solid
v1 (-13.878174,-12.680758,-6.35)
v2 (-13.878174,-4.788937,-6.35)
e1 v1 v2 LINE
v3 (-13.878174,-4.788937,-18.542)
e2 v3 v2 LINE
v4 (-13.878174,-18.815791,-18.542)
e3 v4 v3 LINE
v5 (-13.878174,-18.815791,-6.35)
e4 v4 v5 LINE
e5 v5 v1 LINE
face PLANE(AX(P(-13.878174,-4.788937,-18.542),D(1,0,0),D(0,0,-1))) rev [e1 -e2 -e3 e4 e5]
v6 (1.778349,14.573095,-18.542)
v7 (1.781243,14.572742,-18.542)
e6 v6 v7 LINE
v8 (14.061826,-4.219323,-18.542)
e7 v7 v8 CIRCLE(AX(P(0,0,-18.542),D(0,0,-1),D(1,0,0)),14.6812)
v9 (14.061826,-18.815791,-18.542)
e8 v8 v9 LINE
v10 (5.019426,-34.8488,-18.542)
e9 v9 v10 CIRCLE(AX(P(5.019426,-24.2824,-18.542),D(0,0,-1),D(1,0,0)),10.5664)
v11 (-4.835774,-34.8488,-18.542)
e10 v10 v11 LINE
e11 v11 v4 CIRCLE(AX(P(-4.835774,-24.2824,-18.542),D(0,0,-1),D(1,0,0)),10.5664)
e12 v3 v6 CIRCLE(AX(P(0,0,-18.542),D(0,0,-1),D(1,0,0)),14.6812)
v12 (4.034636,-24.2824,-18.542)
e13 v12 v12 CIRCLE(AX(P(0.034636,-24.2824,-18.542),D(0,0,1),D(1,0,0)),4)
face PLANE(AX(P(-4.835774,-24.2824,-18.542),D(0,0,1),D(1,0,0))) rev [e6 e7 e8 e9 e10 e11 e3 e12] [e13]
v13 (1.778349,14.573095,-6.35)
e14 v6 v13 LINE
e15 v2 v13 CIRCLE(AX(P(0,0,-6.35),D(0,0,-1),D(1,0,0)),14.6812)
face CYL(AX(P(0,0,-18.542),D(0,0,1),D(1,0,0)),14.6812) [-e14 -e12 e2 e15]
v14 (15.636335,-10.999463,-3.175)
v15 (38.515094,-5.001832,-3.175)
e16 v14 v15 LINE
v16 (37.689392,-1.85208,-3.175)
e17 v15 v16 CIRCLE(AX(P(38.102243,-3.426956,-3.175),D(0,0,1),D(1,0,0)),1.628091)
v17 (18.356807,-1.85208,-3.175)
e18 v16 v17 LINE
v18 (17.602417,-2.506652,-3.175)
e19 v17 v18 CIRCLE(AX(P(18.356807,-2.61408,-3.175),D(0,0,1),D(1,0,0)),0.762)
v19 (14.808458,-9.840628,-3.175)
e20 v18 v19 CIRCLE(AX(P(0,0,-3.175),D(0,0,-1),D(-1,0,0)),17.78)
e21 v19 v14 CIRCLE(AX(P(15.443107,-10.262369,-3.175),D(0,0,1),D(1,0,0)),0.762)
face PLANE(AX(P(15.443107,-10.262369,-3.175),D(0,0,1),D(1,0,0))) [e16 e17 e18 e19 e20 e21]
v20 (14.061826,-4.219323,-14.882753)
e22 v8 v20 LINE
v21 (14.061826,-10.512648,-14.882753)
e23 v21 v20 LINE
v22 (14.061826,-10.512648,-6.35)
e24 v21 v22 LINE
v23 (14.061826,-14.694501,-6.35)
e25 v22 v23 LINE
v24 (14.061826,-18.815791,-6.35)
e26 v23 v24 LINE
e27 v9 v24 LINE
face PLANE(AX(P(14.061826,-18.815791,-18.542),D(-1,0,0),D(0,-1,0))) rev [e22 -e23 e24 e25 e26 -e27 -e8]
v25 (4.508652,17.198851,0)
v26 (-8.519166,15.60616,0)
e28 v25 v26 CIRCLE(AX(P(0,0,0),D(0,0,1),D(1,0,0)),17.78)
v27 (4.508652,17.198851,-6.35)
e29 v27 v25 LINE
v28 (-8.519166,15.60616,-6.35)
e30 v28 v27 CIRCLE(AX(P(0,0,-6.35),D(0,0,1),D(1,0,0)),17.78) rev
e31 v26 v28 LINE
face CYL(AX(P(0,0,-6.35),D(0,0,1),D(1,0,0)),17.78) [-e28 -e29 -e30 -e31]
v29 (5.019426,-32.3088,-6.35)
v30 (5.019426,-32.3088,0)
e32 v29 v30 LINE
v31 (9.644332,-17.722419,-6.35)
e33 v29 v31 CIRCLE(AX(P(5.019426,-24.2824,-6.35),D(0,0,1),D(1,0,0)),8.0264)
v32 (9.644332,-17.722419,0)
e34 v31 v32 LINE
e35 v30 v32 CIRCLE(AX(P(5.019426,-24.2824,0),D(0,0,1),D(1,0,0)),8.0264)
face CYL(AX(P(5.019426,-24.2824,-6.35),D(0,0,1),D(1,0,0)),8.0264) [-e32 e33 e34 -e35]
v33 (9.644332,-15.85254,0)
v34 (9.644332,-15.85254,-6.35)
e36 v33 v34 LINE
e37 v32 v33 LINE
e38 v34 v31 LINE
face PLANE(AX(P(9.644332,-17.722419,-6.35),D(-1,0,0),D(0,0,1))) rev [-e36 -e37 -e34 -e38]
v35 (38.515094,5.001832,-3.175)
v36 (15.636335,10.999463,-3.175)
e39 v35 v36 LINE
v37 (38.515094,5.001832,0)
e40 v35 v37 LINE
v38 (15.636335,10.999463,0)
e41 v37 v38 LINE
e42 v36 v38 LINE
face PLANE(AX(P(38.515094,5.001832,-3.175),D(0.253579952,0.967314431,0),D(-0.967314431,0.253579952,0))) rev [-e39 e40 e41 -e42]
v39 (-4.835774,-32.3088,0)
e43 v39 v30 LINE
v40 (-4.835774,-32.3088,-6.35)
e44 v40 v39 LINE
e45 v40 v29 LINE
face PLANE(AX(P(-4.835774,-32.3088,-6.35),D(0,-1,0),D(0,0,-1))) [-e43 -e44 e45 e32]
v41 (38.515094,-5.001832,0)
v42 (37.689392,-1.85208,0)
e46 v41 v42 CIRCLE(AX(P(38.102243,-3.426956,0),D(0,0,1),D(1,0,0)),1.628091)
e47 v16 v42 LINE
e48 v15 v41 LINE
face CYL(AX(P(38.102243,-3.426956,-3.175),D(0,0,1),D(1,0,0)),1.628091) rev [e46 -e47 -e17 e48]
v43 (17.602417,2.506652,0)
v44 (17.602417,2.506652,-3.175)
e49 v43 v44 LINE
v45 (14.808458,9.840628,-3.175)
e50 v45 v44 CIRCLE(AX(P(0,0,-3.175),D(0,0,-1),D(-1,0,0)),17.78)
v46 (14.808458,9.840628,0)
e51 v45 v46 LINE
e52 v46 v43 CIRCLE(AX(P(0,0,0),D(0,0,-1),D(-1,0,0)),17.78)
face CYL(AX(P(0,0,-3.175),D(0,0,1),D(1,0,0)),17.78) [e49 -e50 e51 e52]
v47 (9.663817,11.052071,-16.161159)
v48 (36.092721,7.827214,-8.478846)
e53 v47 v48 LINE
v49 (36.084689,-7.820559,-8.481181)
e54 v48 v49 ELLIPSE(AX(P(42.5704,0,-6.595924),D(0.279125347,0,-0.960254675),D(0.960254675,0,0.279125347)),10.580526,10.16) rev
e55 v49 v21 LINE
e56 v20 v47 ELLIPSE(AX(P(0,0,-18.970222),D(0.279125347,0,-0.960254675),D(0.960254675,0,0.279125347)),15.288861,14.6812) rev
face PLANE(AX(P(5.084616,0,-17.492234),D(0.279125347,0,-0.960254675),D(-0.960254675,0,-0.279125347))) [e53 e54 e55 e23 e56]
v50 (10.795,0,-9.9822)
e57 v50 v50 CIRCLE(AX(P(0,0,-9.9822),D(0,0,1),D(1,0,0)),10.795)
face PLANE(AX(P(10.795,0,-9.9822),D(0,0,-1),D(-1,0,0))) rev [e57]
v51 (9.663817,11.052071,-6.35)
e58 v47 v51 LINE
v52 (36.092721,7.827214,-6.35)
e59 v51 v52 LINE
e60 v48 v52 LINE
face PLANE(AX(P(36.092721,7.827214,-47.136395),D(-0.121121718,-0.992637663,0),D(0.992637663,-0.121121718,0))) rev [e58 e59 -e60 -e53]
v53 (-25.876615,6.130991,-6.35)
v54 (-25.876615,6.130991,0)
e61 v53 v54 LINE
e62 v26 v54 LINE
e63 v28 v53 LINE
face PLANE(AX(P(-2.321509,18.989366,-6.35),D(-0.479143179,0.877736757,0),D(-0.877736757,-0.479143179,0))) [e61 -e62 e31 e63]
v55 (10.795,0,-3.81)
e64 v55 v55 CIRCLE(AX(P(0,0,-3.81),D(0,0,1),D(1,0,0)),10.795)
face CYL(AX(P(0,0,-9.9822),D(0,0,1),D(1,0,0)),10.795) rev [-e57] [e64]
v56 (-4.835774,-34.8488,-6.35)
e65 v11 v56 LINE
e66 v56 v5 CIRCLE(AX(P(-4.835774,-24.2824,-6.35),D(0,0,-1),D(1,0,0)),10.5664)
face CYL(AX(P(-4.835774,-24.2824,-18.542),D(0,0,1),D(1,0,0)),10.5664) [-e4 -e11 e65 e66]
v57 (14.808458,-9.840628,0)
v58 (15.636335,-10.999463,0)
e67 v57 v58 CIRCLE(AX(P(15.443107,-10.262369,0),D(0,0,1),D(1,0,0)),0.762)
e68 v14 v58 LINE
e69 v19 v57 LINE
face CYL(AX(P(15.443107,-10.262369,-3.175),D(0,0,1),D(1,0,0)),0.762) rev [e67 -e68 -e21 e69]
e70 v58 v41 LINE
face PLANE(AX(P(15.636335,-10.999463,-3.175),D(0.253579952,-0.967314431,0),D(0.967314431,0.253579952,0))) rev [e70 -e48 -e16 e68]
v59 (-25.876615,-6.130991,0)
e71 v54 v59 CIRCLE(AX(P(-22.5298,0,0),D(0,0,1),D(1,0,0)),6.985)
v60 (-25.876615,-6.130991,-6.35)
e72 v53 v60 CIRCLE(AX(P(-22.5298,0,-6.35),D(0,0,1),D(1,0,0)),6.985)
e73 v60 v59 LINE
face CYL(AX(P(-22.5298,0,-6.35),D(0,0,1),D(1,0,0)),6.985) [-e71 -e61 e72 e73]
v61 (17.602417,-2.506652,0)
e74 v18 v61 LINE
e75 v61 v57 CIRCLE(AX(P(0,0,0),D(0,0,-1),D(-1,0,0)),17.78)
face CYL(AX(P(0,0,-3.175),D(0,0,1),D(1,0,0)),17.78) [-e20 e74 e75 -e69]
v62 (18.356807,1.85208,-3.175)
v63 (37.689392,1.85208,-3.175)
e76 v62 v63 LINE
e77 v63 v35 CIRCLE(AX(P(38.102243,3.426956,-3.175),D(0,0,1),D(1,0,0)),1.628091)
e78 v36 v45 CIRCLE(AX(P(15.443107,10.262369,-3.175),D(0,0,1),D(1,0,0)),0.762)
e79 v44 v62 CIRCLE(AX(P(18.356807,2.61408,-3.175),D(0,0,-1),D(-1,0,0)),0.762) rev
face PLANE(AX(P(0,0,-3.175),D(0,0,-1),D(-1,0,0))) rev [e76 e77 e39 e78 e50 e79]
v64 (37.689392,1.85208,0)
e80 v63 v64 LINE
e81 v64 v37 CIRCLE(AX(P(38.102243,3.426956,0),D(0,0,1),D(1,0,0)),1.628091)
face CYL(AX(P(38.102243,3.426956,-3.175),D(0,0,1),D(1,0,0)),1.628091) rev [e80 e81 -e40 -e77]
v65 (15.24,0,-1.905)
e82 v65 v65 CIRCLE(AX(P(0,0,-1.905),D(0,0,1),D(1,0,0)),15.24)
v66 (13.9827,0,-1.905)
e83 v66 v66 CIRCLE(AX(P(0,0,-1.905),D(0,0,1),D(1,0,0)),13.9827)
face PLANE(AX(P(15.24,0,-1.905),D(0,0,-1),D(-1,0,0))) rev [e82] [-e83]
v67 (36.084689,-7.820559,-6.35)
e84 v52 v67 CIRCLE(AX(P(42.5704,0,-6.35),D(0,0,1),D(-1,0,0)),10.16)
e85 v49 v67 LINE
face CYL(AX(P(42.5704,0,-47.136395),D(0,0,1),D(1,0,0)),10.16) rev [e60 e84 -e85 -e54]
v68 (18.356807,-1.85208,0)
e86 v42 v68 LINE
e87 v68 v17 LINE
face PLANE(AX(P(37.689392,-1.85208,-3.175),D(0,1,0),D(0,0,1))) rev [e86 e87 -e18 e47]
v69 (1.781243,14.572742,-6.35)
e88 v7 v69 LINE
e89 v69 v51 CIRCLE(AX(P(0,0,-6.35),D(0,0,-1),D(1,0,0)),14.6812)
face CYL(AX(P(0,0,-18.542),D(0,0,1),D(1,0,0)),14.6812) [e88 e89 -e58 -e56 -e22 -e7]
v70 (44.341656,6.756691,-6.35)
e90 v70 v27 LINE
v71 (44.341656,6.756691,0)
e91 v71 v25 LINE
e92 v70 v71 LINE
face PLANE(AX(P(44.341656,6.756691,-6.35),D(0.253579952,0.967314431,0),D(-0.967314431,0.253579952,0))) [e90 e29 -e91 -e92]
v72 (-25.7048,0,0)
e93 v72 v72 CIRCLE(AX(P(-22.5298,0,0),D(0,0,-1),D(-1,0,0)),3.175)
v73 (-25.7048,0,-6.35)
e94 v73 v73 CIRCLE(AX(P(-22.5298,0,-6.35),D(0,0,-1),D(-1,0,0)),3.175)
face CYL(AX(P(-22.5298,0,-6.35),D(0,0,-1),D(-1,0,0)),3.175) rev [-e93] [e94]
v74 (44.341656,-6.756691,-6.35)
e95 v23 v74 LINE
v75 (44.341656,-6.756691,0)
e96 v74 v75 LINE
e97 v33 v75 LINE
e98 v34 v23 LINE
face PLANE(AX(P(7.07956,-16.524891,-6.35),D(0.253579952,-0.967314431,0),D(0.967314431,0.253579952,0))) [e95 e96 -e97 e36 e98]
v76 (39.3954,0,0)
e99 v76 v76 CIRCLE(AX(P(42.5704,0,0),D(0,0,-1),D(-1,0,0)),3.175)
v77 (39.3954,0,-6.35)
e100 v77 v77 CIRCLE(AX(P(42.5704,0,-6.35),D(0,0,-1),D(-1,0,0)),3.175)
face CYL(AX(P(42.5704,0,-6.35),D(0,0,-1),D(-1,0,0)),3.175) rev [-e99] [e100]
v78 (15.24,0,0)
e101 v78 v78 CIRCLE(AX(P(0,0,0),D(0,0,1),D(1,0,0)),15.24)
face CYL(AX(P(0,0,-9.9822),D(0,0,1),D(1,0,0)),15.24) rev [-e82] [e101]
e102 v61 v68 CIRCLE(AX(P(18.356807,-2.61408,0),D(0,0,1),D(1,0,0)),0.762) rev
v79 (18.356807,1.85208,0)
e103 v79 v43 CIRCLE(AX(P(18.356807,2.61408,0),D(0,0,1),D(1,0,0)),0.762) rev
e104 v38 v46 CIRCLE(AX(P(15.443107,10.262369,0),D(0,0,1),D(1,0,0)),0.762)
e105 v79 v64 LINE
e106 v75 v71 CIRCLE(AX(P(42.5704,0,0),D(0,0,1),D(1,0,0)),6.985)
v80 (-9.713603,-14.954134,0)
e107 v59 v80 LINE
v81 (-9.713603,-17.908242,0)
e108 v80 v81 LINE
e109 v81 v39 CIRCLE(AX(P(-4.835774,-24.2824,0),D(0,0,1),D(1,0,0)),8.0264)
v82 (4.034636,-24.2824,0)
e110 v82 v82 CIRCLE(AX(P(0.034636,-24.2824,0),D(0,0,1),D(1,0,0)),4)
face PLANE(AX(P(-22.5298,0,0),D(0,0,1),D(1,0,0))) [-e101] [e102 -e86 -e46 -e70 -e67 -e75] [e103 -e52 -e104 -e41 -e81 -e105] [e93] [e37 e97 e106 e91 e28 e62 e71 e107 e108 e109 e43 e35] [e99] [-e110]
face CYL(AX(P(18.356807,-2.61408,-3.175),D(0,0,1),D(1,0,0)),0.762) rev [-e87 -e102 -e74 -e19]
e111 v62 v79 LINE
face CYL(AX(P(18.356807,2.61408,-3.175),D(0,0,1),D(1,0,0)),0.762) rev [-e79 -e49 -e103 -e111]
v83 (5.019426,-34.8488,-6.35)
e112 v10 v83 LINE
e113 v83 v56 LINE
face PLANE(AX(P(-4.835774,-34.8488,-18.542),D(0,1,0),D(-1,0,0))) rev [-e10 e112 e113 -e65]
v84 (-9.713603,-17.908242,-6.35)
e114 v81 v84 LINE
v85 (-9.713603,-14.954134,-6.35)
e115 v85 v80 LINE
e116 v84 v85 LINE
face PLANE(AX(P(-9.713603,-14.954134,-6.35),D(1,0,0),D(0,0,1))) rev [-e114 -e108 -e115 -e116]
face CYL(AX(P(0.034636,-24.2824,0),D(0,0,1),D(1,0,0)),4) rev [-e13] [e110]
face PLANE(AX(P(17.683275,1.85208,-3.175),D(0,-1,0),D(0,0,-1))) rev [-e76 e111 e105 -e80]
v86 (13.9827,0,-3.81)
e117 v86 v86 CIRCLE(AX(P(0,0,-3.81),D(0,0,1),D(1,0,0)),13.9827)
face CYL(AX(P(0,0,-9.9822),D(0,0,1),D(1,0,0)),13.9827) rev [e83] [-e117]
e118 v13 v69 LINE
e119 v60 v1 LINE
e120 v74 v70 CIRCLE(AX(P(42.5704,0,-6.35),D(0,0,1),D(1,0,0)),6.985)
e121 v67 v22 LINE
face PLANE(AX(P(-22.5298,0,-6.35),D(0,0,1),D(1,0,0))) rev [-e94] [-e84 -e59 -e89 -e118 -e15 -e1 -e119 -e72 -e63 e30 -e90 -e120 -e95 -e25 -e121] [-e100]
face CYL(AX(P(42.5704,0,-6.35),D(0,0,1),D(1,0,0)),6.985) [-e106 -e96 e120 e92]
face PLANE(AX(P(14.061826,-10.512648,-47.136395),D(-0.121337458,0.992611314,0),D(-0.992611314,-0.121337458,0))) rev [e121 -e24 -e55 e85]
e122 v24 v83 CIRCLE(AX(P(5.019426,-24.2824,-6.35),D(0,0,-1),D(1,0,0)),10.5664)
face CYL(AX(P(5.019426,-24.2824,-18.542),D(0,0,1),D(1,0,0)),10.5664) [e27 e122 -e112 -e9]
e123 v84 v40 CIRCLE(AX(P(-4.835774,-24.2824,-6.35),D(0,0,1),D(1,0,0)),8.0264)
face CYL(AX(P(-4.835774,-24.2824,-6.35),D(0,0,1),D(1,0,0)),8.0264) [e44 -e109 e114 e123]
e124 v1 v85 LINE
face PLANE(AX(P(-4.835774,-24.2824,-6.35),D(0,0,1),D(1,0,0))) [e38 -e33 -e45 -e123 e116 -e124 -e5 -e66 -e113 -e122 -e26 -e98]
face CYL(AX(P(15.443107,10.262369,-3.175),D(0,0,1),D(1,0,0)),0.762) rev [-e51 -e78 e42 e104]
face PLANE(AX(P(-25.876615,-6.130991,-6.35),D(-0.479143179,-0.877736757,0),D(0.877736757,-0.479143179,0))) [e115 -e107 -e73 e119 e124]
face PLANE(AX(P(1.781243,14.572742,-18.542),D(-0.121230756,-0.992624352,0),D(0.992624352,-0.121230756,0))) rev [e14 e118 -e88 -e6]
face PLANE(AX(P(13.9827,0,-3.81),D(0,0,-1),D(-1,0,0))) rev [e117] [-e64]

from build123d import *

# Parameters (mm, degrees)
BOSS_EXTRUDE1_DEPTH      = 6.35
BOSS_EXTRUDE2_DEPTH      = 12.192
BOSS_EXTRUDE3_REACH      = 63.797
CUT_EXTRUDE1_DEPTH       = 3.175
CUT_EXTRUDE2_DEPTH       = 3.175
F_8_0_8_DIAMETER_HOLE1_D = 8
HOLE1_D                  = 6.35
CHAMFER1_SIZE            = 3.256138018
CHAMFER2_SIZE            = 2.651435284
FILLET1_R                = 0.762
FILLET2_R                = 17.78


with BuildPart() as part:
    # Sketch1 → Boss-Extrude1 (new body)
    with BuildSketch(Plane.XY):
        with BuildLine():
            Line((-25.876615107, -6.130991244), (-6.855570788, -16.51429077))
            ThreePointArc((-6.855570788, -16.51429077), (-12.797339629, -25.300522195), (-4.835774214, -32.308799856))
            Line((-4.835774214, -32.308799856), (5.019425786, -32.308799856))
            ThreePointArc((5.019425786, -32.308799856), (12.97831912, -25.32120391), (7.079560008, -16.524890981))
            Line((7.079560008, -16.524890981), (44.341655967, -6.756691298))
            ThreePointArc((44.341655967, -6.756691298), (49.5554, 0), (44.341655967, 6.756691298))
            Line((44.341655967, 6.756691298), (-2.321508902, 18.989366367))
            Line((-2.321508902, 18.989366367), (-25.876615107, 6.130991244))
            ThreePointArc((-25.876615107, 6.130991244), (-29.5148, 0), (-25.876615107, -6.130991244))
        make_face()
    extrude(amount=-BOSS_EXTRUDE1_DEPTH)

    # Sketch2 → Boss-Extrude2 (add)
    with BuildSketch(Plane(origin=(0, 0, -6.35), x_dir=(-1, 0, 0), z_dir=(0, 0, -1))):
        with BuildLine():
            Line((4.835774214, -34.848799856), (-5.019425786, -34.848799856))
            ThreePointArc((-5.019425786, -34.848799856), (-14.222989868, -29.47308547), (-14.061825786, -18.815791108))
            Line((-14.061825786, -18.815791108), (-14.061825783, -4.219323287))
            ThreePointArc((-14.061825783, -4.219323287), (-12.289675842, 8.031282652), (-1.781242501, 14.572741966))
            Line((-1.781242501, 14.572741966), (-1.778349168, 14.573095333))
            ThreePointArc((-1.778349168, 14.573095333), (11.415932367, 9.231149524), (13.878174214, -4.788936617))
            Line((13.878174214, -4.788936617), (13.878174214, -18.815791108))
            ThreePointArc((13.878174214, -18.815791108), (14.039338296, -29.47308547), (4.835774214, -34.848799856))
        make_face()
    extrude(amount=BOSS_EXTRUDE2_DEPTH)

    # Boss-Extrude3: up to this plane
    boss_extrude3_end = Plane(origin=(5.084615624, 0, -17.49223415), z_dir=(0.2791253467698281, 0, -0.9602546749642114))
    # Sketch4 → Boss-Extrude3 (add, up to the surface)
    with BuildSketch(Plane(origin=(0, 0, -6.35), x_dir=(-1, 0, 0), z_dir=(0, 0, -1)), mode=Mode.PRIVATE) as boss_extrude3_sk1:
        with BuildLine():
            Line((-36.092721498, 7.827214142), (-9.663817118, 11.052070939))
            ThreePointArc((-9.663817118, 11.052070939), (-14.107813549, 4.062909083), (-14.061825786, -4.219323276))
            Line((-14.061825786, -4.219323276), (-14.061825786, -10.512648454))
            Line((-14.061825786, -10.512648454), (-36.084688558, -7.820559257))
            ThreePointArc((-36.084688558, -7.820559257), (-32.410401339, 0.005215736), (-36.092721498, 7.827214142))
        make_face()
    boss_extrude3_tool1 = split(extrude(boss_extrude3_sk1.sketch, amount=BOSS_EXTRUDE3_REACH, mode=Mode.PRIVATE), bisect_by=boss_extrude3_end, keep=Keep.BOTH, mode=Mode.PRIVATE)
    add(boss_extrude3_tool1.solids().sort_by_distance((23.208362, 0.258221, -6.35))[0])

    # Sketch5 → Cut-Extrude1 (cut)
    with BuildSketch(Plane.XY):
        with BuildLine():
            Line((17.683274588, 1.852079867), (37.689391665, 1.852079867))
            ThreePointArc((37.689391665, 1.852079867), (39.677118992, 3.014104647), (38.515094212, 5.001831974))
            Line((38.515094212, 5.001831974), (15.636334606, 10.999462718))
            ThreePointArc((15.636334606, 10.999462718), (14.82307645, 10.705321164), (14.808458463, 9.840627925))
            ThreePointArc((14.808458463, 9.840627925), (16.729686315, 6.020464751), (17.683274588, 1.852079867))
        make_face()
    extrude(amount=-CUT_EXTRUDE1_DEPTH, mode=Mode.SUBTRACT)

    # Sketch6 → Cut-Extrude2 (cut)
    with BuildSketch(Plane.XY):
        with BuildLine():
            Line((15.636334606, -10.999462718), (38.515094212, -5.001831974))
            ThreePointArc((38.515094212, -5.001831974), (39.677118992, -3.014104647), (37.689391665, -1.852079867))
            Line((37.689391665, -1.852079867), (17.683274588, -1.852079867))
            ThreePointArc((17.683274588, -1.852079867), (16.729686315, -6.020464751), (14.808458463, -9.840627925))
            ThreePointArc((14.808458463, -9.840627925), (14.82307645, -10.705321164), (15.636334606, -10.999462718))
        make_face()
    extrude(amount=-CUT_EXTRUDE2_DEPTH, mode=Mode.SUBTRACT)

    # Sketch7 → Cut-Revolve1 (revolve, cut)
    with BuildSketch(Plane(origin=(0, 0, 0), x_dir=(1, 0, 0), z_dir=(0, 1, 0))):
        Polygon((10.795, 9.9822), (0, 9.9822), (0, 0), (15.24, 0), (15.24, 1.905), (13.9827, 1.905), (13.9827, 3.81), (10.795, 3.81), align=None)
    revolve(axis=Axis((0, 0, -9.9822), (0, 0, 1)), mode=Mode.SUBTRACT)

    # Ø8.0 (8) Diameter Hole1 (through all)
    with Locations(Plane.XY):
        with Locations((0.034636225, -24.282399856)):
            Hole(F_8_0_8_DIAMETER_HOLE1_D / 2)

    # Hole1 (through all)
    with Locations(Plane(origin=(0, 0, -6.35), x_dir=(-1, 0, 0), z_dir=(0, 0, -1))):
        with Locations((-42.5704, 0), (22.5298, 0)):
            Hole(HOLE1_D / 2)

    # Chamfer1
    # the kernel refuses this chamfer: 3.256138018, 2.953062062 mm, written as the material it adds along each edge
    with BuildSketch(Plane(origin=(-6.855570788, -16.51429077, 0), x_dir=(-0.8777367565349716, 0.4791431792559171, 0), z_dir=(0, 0, -1))) as chamfer1_piece_1:
        with BuildLine():
            Line((CHAMFER1_SIZE, 0), (1.840697413, -2.592929003))
            ThreePointArc((1.840697413, -2.592929003), (1.066981917, -1.228355945), (0, 0))
            Line((0, 0), (CHAMFER1_SIZE, 0))
        make_face()
    extrude(amount=14.651282068)

    # Chamfer2
    # the kernel refuses this chamfer: 2.653671842, 2.651435284 mm, written as the material it adds along each edge
    with BuildSketch(Plane(origin=(7.079560008, -16.524890981, 0), x_dir=(0.9060971467141865, -0.4230696877778058, 0), z_dir=(0, 0, -1))) as chamfer2_piece_1:
        with BuildLine():
            Line((2.830570234, 0), (CHAMFER2_SIZE * 0.769198854398, -CHAMFER2_SIZE * 0.639009485396))
            Line((CHAMFER2_SIZE * 0.769198854398, -CHAMFER2_SIZE * 0.639009485396), (0, 0))
            ThreePointArc((0, 0), (1.438235904, -0.125730188), (2.830570234, 0))
        make_face()
    extrude(amount=13.542714548)

    # Fillet1
    fillet1_edges = [part.edges().sort_by_distance(p)[0] for p in [
        (17.683274588, 1.852079867, -1.5875),
        (17.683274588, -1.852079867, -1.5875),
    ]]
    fillet(fillet1_edges, radius=FILLET1_R)

    # Fillet2
    fillet2_edges = [part.edges().sort_by_distance(p)[0] for p in [
        (-2.321508902, 18.989366367, -3.175),
    ]]
    fillet(fillet2_edges, radius=FILLET2_R)


solid = part.part
